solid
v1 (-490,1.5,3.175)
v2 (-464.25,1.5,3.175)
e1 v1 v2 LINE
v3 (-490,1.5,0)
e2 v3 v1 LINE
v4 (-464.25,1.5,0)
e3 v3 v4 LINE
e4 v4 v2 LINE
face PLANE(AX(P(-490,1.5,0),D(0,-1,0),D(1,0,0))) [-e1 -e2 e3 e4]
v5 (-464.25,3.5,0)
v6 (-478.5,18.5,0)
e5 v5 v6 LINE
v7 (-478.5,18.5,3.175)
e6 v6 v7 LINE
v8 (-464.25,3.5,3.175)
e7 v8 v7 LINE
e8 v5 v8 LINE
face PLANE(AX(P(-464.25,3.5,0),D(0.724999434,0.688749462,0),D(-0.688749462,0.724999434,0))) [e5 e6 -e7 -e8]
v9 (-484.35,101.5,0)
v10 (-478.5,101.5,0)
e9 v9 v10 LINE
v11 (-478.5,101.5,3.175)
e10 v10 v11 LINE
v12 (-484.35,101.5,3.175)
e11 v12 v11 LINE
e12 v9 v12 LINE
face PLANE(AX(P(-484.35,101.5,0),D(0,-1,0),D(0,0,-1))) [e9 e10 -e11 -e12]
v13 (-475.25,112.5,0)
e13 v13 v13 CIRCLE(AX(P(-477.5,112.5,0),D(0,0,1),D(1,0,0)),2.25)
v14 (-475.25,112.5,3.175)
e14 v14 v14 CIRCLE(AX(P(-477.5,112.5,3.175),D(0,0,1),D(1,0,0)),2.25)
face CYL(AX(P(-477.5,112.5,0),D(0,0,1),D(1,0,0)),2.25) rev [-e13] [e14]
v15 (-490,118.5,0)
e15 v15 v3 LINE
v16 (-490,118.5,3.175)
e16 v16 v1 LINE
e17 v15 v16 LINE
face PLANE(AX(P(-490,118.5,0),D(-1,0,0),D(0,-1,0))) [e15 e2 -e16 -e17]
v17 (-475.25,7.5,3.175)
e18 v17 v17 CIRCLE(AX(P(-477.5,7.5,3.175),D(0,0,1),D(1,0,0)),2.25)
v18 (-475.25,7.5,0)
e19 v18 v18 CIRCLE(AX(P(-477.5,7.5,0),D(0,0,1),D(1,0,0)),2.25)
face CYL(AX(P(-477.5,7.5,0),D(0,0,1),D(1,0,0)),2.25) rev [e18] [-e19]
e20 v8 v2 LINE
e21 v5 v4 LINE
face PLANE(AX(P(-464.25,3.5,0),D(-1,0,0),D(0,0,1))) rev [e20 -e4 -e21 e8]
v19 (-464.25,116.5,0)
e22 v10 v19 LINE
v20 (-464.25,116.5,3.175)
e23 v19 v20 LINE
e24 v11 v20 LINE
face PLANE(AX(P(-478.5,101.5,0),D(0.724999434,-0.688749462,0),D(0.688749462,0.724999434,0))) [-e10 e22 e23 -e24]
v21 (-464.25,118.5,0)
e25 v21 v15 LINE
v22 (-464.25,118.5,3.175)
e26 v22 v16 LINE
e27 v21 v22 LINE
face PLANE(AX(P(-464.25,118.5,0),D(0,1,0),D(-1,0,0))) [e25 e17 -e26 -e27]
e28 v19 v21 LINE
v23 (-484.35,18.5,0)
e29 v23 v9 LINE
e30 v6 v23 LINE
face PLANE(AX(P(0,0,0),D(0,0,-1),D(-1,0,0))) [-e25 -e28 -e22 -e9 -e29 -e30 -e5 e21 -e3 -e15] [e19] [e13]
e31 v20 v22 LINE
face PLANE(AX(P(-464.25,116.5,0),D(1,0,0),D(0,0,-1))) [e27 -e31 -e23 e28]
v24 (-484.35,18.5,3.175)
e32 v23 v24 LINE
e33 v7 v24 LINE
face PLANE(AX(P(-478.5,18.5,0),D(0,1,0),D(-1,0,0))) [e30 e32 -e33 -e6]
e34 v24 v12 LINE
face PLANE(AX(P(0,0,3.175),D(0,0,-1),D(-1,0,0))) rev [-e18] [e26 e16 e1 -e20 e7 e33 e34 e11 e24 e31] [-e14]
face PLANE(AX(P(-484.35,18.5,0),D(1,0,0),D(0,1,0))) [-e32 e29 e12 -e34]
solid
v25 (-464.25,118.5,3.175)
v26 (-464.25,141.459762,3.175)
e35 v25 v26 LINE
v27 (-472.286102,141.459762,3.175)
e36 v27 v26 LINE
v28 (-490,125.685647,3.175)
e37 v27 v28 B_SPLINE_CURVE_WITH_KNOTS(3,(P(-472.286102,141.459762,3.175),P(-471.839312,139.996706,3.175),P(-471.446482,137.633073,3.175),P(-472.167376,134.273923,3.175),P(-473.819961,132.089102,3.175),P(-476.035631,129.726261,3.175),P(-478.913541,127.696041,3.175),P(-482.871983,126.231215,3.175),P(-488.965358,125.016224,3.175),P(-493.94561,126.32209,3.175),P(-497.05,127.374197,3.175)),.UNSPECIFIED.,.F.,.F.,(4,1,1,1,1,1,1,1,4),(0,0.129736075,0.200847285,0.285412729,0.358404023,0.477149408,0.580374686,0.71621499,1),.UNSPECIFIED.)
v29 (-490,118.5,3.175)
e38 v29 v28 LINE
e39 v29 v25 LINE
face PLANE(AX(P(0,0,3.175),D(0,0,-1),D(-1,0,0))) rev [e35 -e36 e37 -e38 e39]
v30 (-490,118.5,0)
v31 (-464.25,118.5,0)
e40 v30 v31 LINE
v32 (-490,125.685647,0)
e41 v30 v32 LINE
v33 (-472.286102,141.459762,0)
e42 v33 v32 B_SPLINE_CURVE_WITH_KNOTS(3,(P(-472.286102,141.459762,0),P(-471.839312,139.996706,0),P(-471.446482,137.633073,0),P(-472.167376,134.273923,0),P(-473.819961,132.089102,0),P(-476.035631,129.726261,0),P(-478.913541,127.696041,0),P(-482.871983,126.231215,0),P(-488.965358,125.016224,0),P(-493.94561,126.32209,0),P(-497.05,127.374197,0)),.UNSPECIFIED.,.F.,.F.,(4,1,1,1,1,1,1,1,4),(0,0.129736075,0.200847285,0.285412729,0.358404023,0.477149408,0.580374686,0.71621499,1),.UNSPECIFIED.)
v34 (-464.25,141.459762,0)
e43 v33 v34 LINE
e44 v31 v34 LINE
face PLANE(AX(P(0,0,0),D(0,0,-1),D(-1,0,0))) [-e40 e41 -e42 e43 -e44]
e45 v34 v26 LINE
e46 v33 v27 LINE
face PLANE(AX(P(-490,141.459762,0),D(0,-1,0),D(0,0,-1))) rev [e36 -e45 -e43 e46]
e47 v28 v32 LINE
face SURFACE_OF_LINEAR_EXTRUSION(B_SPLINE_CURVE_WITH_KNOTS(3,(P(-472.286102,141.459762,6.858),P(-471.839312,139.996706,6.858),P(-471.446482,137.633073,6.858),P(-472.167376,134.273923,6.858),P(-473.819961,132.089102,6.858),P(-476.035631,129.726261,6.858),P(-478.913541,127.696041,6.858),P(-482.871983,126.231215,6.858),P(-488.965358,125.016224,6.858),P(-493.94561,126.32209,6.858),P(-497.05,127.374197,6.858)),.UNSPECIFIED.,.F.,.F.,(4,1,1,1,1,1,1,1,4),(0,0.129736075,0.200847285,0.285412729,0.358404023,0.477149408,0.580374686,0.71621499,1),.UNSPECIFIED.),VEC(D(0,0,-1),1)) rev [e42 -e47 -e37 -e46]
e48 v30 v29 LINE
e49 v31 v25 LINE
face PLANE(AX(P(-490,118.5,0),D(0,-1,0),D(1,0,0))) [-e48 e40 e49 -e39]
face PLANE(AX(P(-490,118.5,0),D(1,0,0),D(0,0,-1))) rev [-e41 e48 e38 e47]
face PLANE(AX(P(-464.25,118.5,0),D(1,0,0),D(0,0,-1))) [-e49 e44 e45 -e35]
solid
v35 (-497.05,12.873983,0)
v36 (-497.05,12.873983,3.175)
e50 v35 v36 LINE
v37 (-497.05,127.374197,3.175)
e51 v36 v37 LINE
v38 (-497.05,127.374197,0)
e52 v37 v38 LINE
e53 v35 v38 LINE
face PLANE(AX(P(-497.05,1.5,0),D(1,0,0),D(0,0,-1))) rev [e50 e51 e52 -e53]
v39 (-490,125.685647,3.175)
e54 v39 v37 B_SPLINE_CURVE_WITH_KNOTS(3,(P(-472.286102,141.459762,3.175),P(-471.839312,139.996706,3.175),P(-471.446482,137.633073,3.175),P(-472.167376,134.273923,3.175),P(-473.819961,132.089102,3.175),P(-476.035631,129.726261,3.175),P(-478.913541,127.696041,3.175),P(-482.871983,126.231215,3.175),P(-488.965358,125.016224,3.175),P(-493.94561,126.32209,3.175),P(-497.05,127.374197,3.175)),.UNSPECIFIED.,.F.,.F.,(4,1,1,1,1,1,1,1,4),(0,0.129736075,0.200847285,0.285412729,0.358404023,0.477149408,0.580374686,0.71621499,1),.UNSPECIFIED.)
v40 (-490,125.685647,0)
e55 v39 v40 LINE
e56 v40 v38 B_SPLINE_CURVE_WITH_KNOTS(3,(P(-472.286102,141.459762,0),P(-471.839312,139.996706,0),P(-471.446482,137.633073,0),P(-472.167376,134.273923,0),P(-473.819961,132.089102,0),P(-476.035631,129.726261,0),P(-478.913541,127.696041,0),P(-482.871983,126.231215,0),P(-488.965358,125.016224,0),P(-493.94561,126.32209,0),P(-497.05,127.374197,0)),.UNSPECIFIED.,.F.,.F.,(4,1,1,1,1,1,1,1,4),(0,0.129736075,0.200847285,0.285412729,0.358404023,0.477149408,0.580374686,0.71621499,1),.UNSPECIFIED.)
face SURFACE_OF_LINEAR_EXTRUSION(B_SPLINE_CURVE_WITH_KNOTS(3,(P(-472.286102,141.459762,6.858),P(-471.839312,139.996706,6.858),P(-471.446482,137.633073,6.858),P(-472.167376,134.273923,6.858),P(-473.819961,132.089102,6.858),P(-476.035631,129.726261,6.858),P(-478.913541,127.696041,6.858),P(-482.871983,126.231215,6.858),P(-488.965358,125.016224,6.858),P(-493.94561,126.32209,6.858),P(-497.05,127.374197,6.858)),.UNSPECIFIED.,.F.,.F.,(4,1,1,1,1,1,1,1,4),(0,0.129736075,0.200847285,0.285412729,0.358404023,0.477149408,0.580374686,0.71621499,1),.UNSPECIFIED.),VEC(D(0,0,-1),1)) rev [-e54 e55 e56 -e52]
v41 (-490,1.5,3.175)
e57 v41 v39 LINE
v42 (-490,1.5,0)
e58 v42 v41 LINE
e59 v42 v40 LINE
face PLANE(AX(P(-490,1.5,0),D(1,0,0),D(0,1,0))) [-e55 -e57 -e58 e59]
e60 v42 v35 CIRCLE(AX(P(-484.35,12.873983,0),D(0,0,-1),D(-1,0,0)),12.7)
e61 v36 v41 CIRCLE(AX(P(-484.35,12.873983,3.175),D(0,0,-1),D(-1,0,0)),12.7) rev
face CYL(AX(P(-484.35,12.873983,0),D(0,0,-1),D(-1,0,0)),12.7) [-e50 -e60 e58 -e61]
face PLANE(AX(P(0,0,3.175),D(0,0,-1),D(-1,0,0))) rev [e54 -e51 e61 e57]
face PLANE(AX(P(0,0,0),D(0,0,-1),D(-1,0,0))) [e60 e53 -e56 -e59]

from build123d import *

# Parameters (mm, degrees)
F_3DSKETCH1_R         = 2.25
BOSS_EXTRUDE1_DEPTH   = 3.175
BOSS_EXTRUDE1_2_DEPTH = 3.175
BOSS_EXTRUDE1_3_DEPTH = 3.175
CUT_EXTRUDE1_DEPTH    = 6.858
FILLET1_R             = 12.7


with BuildPart() as part:
    # 3DSketch1 → Boss-Extrude1 (new body)
    with BuildSketch(Plane(origin=(-464.25, 116.5, 0), x_dir=(-0.2742793236442644, -0.961650067655197, 0), z_dir=(0, 0, -1))):
        Polygon((-1.923300135, 0.548558647), (0, 0), (18.333231377, 9.589323609), (19.93776542, 15.214976505), (99.754721035, -7.550207357), (98.150186992, -13.175860253), (108.666457645, -30.993563572), (110.58975778, -31.542122219), (117.652450364, -6.779632977), (5.139392449, 25.311047889), align=None)
        with Locations(Location((108.454058413, -17.154582881, 0), (0, 0, 254.080928829))):
            Circle(F_3DSKETCH1_R, mode=Mode.SUBTRACT)
        with Locations(Location((7.480801309, 11.644746102, 0), (0, 0, 254.080928829))):
            Circle(F_3DSKETCH1_R, mode=Mode.SUBTRACT)
    extrude(amount=-BOSS_EXTRUDE1_DEPTH)


with BuildPart() as body_2:
    # 3DSketch1 → Boss-Extrude1 2 (new body)
    with BuildSketch(Plane(origin=(-464.25, 116.5, 0), x_dir=(-0.2742793236442644, -0.961650067655197, 0), z_dir=(0, 0, -1))):
        Polygon((-24.002556771, 6.845946627), (-1.923300135, 0.548558647), (5.139392449, 25.311047889), (-16.939864187, 31.608435869), align=None)
    extrude(amount=-BOSS_EXTRUDE1_2_DEPTH)


with BuildPart() as body_3:
    # 3DSketch1 → Boss-Extrude1 3 (new body)
    with BuildSketch(Plane(origin=(-464.25, 116.5, 0), x_dir=(-0.2742793236442644, -0.961650067655197, 0), z_dir=(0, 0, -1))):
        Polygon((-16.939864187, 31.608435869), (5.139392449, 25.311047889), (117.652450364, -6.779632977), (119.586119596, 0), (-15.006194955, 38.388068846), align=None)
    extrude(amount=-BOSS_EXTRUDE1_3_DEPTH)


with BuildPart() as cut_extrude1_tool:
    # Sketch1 → Cut-Extrude1 (new body)
    with BuildSketch(Plane(origin=(0, 0, 0), x_dir=(-1, 0, 0), z_dir=(0, 0, -1))):
        with BuildLine():
            Line((472.286101812, 141.459761953), (497.05, 141.459761953))
            Line((497.05, 141.459761953), (497.05, 127.374197193))
            add(Edge.make_bspline(
                [(472.286101812, 141.459761953), (471.839311888, 139.996705849), (471.446482376, 137.63307279), (472.167376182, 134.273923046), (473.819960888, 132.089102365), (476.035631474, 129.726261313), (478.913541328, 127.696041036), (482.87198304, 126.231214629), (488.965357723, 125.016223815), (493.945609682, 126.32208958), (497.05, 127.374197193)],
                knots=[0, 0, 0, 0, 0.129736075, 0.200847285, 0.285412729, 0.358404023, 0.477149408, 0.580374686, 0.71621499, 1, 1, 1, 1], degree=3))
        make_face()
    extrude(amount=-CUT_EXTRUDE1_DEPTH)


with BuildPart() as body_2_1:
    add(body_2.part)

    # Cut-Extrude1: cut by cut_extrude1_tool
    add(cut_extrude1_tool.part, mode=Mode.SUBTRACT)


with BuildPart() as body_3_1:
    add(body_3.part)

    # Cut-Extrude1: cut by cut_extrude1_tool
    add(cut_extrude1_tool.part, mode=Mode.SUBTRACT)

    # Fillet1
    # the kernel refuses this fillet: 12.7 mm, written as the material it takes off along each edge
    with BuildSketch(Plane(origin=(-497.05, 1.5, -28.434958678), x_dir=(0, 1, 0), z_dir=(0, 0, 1))) as fillet1_piece_1:
        with BuildLine():
            CenterArc((11.373983471, -12.7), FILLET1_R, 90, 63.584217644)
            Line((0, -7.05), (-0.227479669, -6.937))
            ThreePointArc((-0.227479669, -6.937), (-0.254, -3.525), (-0.254, 0))
            Line((-0.254, 0), (0, 0.254))
            Line((0, 0.254), (11.373983471, 0.254))
            Line((11.373983471, 0.254), (11.373983471, 0))
        make_face()
    extrude(amount=60.044917355, mode=Mode.SUBTRACT)


solid = Compound([part.part, body_2_1.part, body_3_1.part])
